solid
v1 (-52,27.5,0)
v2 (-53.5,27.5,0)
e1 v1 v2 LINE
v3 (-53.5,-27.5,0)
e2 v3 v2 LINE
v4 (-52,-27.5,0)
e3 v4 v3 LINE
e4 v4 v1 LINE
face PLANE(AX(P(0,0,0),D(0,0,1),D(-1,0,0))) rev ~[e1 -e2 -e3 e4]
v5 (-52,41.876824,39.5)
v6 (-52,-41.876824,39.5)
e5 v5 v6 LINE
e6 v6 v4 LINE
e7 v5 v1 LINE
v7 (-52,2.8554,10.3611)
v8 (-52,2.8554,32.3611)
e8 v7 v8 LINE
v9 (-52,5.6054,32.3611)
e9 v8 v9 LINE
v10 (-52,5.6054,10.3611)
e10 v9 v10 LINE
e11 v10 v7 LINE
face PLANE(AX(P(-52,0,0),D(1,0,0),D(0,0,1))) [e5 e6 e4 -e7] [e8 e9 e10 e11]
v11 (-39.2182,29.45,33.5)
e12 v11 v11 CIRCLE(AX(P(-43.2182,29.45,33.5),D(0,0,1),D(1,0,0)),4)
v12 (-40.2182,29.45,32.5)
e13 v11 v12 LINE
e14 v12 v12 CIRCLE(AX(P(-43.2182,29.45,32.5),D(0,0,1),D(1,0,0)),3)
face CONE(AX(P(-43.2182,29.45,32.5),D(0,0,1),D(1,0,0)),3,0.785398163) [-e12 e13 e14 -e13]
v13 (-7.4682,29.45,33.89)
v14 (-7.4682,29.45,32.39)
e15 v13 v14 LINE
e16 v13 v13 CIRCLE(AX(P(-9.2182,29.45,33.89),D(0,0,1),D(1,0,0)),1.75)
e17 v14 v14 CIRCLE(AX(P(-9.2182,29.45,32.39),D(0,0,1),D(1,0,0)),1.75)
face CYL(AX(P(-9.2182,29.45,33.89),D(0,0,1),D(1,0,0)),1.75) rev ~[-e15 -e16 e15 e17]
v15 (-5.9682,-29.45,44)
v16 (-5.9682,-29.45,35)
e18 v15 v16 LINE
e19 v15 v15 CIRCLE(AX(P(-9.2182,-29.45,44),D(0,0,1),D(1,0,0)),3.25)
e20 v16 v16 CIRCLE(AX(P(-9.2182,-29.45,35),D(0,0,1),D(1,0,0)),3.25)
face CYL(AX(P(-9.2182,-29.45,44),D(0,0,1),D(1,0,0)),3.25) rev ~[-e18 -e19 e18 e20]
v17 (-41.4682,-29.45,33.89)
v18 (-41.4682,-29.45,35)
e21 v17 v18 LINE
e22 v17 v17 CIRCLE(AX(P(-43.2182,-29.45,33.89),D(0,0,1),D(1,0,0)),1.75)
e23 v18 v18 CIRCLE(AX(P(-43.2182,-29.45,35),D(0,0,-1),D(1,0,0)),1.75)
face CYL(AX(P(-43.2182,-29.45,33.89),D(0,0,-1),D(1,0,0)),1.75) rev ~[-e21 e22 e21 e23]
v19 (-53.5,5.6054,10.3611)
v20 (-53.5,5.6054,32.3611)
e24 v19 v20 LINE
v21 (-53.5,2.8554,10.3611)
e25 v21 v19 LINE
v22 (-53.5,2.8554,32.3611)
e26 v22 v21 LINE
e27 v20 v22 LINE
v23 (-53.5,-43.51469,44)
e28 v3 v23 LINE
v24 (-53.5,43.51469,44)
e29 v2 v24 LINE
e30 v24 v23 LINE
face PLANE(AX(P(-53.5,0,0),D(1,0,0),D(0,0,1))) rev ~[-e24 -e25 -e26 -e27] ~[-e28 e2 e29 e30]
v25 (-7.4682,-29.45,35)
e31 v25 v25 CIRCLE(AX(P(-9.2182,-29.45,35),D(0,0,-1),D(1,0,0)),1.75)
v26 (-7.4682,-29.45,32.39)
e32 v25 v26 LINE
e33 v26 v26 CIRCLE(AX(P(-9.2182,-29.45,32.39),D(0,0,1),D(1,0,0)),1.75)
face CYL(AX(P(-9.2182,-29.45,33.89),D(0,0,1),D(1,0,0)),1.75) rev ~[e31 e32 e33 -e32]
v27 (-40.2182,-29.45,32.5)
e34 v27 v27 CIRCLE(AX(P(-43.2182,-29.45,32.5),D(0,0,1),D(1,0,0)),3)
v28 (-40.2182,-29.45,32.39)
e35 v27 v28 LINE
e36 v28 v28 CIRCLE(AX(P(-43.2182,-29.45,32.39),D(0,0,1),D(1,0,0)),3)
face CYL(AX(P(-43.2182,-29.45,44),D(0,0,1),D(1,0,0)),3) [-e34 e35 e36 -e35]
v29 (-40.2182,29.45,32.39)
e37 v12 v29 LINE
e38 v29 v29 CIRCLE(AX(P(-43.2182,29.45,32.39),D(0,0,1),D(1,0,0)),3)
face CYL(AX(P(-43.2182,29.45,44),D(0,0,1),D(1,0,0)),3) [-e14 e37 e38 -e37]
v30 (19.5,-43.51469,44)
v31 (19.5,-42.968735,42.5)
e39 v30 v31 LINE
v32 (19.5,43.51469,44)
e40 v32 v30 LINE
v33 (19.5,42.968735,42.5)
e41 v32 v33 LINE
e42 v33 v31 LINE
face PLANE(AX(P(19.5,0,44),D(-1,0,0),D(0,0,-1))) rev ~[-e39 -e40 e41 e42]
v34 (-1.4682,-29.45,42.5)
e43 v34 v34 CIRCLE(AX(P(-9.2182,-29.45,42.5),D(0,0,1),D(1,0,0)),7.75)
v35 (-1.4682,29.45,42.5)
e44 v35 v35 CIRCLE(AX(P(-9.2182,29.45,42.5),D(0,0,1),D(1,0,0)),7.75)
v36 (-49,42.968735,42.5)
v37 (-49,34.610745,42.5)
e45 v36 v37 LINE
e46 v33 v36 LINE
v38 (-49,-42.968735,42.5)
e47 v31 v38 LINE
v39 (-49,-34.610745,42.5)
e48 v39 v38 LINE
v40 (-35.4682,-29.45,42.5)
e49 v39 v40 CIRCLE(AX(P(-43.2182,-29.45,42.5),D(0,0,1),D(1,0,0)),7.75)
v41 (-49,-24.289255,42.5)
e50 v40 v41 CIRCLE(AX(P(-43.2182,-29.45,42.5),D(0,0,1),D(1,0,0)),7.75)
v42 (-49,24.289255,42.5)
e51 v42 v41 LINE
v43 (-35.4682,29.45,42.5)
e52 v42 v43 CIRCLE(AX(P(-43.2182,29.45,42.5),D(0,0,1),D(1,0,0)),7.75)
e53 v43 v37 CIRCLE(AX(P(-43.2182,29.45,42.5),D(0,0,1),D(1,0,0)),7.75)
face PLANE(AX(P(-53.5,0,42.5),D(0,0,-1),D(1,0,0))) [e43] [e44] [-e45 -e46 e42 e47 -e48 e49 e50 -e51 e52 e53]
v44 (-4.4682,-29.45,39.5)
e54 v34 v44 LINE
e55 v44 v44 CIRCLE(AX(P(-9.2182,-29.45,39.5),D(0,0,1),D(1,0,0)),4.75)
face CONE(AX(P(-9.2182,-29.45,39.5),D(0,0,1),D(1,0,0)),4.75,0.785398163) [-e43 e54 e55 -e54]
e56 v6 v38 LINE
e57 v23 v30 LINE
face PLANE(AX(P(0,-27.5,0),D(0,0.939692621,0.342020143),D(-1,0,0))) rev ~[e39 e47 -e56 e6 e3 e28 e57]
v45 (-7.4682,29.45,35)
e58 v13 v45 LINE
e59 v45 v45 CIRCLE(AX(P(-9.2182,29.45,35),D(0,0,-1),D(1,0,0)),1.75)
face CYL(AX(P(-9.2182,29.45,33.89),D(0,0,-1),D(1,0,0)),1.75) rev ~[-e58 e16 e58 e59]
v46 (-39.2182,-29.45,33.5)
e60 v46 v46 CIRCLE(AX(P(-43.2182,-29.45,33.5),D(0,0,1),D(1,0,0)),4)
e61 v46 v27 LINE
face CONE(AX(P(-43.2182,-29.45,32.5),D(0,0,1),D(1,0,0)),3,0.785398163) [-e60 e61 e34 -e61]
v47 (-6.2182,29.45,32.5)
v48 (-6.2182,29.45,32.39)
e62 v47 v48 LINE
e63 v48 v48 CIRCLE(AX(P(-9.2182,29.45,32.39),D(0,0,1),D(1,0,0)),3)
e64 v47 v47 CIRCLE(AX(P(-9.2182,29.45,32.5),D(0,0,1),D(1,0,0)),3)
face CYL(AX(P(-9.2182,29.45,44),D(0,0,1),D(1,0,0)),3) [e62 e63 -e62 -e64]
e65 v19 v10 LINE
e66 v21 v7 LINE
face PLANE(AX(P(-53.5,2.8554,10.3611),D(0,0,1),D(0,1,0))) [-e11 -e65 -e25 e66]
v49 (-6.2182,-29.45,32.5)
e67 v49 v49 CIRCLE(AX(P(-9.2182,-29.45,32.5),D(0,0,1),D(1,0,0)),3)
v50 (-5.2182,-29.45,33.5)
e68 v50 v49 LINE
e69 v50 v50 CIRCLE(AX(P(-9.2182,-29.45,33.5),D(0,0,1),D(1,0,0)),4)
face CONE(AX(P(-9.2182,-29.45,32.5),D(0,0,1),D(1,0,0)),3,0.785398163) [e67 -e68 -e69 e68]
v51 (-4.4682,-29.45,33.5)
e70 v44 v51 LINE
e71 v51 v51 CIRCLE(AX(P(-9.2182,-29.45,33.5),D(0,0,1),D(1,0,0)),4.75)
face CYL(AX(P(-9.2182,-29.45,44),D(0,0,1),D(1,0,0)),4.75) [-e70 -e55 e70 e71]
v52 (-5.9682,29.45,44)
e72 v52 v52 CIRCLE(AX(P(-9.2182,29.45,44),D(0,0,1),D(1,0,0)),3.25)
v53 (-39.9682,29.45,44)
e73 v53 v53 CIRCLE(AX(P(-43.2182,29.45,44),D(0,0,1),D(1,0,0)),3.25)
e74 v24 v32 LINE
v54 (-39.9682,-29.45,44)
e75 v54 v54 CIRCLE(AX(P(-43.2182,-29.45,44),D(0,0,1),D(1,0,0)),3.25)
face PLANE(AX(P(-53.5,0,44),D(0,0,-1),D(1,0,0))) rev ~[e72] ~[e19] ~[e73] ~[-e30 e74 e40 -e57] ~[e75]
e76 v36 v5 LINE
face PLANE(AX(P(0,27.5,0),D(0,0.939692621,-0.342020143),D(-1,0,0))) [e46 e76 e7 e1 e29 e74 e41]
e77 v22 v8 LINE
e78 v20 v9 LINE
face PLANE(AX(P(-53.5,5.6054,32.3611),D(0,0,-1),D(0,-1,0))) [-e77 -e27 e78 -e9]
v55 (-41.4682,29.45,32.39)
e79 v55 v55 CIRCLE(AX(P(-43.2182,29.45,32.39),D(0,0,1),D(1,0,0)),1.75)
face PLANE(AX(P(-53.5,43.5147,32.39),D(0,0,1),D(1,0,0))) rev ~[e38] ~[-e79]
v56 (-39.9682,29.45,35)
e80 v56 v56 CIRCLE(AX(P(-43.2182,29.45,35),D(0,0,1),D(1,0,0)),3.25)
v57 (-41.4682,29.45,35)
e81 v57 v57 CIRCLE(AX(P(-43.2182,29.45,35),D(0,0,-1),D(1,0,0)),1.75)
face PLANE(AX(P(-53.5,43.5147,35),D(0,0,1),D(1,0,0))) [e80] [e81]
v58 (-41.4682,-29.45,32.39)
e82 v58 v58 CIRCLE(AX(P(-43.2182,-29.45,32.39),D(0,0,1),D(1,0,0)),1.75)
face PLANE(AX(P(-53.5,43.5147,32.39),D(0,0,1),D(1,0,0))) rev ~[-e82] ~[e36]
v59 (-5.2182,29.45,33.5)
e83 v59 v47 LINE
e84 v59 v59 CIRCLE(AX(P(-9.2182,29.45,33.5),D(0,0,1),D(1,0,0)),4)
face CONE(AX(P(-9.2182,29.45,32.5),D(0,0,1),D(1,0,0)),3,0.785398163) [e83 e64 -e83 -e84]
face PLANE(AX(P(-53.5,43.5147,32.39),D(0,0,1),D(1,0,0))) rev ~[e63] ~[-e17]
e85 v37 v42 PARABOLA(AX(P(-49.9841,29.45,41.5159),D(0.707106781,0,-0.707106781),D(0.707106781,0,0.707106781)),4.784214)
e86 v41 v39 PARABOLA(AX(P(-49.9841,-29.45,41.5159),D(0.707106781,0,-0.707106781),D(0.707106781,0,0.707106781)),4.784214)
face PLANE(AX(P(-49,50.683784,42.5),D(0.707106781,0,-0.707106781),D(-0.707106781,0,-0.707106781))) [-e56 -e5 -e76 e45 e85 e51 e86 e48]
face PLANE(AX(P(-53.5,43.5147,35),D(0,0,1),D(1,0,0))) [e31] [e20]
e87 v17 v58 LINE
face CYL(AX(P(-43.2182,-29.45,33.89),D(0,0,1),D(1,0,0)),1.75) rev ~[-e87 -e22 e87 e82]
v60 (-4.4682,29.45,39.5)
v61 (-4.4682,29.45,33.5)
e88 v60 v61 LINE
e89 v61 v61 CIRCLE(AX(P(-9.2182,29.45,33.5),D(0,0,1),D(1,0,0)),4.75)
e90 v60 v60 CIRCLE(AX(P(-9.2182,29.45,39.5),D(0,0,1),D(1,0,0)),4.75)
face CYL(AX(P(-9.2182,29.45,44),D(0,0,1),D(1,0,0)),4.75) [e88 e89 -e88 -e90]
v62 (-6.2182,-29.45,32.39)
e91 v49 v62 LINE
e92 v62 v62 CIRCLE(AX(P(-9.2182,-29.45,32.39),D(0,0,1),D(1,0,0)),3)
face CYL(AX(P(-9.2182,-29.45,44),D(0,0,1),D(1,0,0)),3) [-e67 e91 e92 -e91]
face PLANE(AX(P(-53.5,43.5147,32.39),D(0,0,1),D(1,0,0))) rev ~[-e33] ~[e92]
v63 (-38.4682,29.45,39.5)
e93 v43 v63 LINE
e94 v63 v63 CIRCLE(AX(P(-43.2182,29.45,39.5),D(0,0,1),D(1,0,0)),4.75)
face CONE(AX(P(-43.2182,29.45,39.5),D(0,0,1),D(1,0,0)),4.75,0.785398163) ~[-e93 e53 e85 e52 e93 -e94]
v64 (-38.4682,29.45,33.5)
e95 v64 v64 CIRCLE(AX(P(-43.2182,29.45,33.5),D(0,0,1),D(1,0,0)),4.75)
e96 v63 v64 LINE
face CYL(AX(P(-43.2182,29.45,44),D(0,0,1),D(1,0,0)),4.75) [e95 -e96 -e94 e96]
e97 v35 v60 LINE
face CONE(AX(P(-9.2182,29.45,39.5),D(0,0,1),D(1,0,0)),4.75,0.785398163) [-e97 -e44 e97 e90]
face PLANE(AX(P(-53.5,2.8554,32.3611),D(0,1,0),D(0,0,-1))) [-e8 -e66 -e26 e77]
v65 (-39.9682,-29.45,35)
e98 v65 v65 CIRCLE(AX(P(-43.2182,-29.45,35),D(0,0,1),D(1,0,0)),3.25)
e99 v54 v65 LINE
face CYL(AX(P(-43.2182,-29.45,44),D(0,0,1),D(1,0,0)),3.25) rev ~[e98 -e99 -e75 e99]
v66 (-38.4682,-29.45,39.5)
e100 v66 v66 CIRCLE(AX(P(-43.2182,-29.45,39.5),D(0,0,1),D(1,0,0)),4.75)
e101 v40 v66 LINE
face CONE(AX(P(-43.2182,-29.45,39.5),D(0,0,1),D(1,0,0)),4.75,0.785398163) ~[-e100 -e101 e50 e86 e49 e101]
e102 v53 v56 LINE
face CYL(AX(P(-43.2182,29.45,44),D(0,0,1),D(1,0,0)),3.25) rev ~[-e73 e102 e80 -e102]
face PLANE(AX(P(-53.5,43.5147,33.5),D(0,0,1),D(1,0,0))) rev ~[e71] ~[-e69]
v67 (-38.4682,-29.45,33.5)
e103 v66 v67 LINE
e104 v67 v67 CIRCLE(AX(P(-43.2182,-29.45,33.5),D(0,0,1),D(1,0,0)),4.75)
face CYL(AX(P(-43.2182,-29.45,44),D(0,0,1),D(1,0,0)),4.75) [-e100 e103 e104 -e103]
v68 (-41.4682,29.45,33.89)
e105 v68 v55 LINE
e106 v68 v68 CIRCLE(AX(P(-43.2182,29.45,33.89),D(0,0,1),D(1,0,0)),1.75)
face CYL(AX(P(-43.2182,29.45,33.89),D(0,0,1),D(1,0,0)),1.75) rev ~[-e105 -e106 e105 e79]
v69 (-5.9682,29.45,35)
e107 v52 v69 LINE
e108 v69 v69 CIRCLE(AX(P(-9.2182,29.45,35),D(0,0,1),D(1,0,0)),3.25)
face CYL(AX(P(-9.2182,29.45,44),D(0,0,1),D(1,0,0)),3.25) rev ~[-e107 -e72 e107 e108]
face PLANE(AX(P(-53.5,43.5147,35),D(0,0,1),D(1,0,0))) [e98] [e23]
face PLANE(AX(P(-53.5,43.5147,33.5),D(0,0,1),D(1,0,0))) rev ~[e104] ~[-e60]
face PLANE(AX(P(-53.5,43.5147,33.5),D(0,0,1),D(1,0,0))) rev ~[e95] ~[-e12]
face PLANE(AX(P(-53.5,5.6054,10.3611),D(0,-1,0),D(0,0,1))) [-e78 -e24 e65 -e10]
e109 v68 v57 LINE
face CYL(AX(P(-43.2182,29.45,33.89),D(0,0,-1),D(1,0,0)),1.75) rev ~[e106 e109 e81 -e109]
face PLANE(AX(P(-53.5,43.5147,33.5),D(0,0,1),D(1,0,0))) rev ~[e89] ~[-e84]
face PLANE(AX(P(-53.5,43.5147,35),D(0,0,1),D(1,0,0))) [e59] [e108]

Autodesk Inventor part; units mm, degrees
ref_plane "YZ Plane" through (0, 0, 0) normal (1, 0, 0) x (0, 1, 0)
ref_plane "XZ Plane" through (0, 0, 0) normal (0, 1, 0) x (-1, 0, 0)
ref_plane "XY Plane" through (0, 0, 0) normal (0, 0, 1) x (1, 0, 0)
sketch "Sketch1" plane through (0, 0, 0) normal (0, 1, 0) x (-1, 0, 0)
  line L0 (0, 0) -> (53.5, 0)
  line L1 (53.5, 0) -> (53.5, 44)
  line L2 (53.5, 44) -> (-19.5, 44)
  line L3 (-19.5, 44) -> (-19.5, 21)
  line L4 (-19.5, 21) -> (0, 0)
  dimension "d3" = 53.5
  dimension "d4" = 44
  dimension "d5" = 23
  dimension "d6" = 73
extrude "Extrusion1" add sketch "Sketch1" along normal mid plane 55
draft "FaceDraft1" angle 20 pull direction (0, 0, -1) faces at (-11.3333, 27.5, 29.3333) (-11.3333, -27.5, 29.3333) fixed edges at (-26.75, 27.5, 0) (-26.75, -27.5, 0)
sketch "Sketch2" plane through (-53.5, 43.5147, 44) normal (0, 0, 1) x (1, 0, 0)
  circle A0 centre (44.2818, -14.0647) radius 1.5 projected
  circle A1 centre (10.2818, -14.0647) radius 1.5 projected
  circle A2 centre (10.2818, -72.9647) radius 1.5 projected
  circle A3 centre (44.2818, -72.9647) radius 1.5 projected
  point P0 (53.5, -43.5147)
extrude "Extrusion2" cut sketch "Sketch2" against normal blind 10.11
sketch "Sketch3" plane through (-53.5, 43.5147, 44) normal (0, 0, 1) x (1, 0, 0)
  circle A0 centre (44.2818, -14.0647) radius 1.5 projected
  circle A1 centre (44.2818, -14.0647) radius 3.25
  circle A2 centre (10.2818, -14.0647) radius 1.5 projected
  circle A3 centre (10.2818, -14.0647) radius 3.25
  circle A4 centre (10.2818, -72.9647) radius 1.5 projected
  circle A5 centre (10.2818, -72.9647) radius 3.25
  circle A6 centre (44.2818, -72.9647) radius 1.5 projected
  circle A7 centre (44.2818, -72.9647) radius 3.25
  point P0 (53.5, -43.5147)
  dimension "d10" = 6.5
extrude "Extrusion3" cut sketch "Sketch3" against normal blind 9
shell "Shell1" thickness 1.5 removed faces 5 at (19.5, -11.7145, 36.3333) at (13, 9.1667, 14) at (-35.6667, 32.8382, 14.6667) at (-35.6667, -32.8382, 14.6667) at (-17.8333, -9.1667, 0)
chamfer "Chamfer1" distance 3 angle 45 4 edges at (-13.9682, -29.45, 42.5) (-47.9682, -29.45, 42.5) (-13.9682, 29.45, 42.5) (-47.9682, 29.45, 42.5)
chamfer "Chamfer2" distance 1 angle 45 4 edges at (-12.2182, -29.45, 33.5) (-46.2182, -29.45, 33.5) (-12.2182, 29.45, 33.5) (-46.2182, 29.45, 33.5)
sketch "Sketch4" plane through (-9.2182, -29.45, 33.89) normal (0, 0, 1) x (1, 0, 0)
  circle A0 centre (0, 0) radius 1.5 construction
  circle A1 centre (-34, 0) radius 1.5 construction
  circle A2 centre (0, 58.9) radius 1.5 construction
  circle A3 centre (-34, 58.9) radius 1.5 construction
  circle A4 centre (-34, 58.9) radius 1.75
  circle A5 centre (0, 58.9) radius 1.75
  circle A6 centre (0, 0) radius 1.75
  circle A7 centre (-34, 0) radius 1.75
  point P0 (9.2182, 29.45)
  dimension "d19" = 3.5
extrude "Extrusion4" cut sketch "Sketch4" along normal through all both and the other way through all
chamfer "Chamfer3" distance 3 angle 45 1 edges at (-52, 0, 42.5)
sketch "Sketch5" plane through (-53.5, -43.5147, 44) normal (-1, 0, 0) x (0, 0, 1)
  line L0 (-33.6389, 49.1201) -> (-11.6389, 49.1201)
  line L1 (-11.6389, 49.1201) -> (-11.6389, 46.3701)
  line L2 (-11.6389, 46.3701) -> (-33.6389, 46.3701)
  line L3 (-33.6389, 46.3701) -> (-33.6389, 49.1201)
  point P0 (-44, 43.5147)
  dimension "d25" = 22
  dimension "d26" = 2.75
extrude "Extrusion5" cut sketch "Sketch5" against normal blind 9
properties part number "Case 2"
